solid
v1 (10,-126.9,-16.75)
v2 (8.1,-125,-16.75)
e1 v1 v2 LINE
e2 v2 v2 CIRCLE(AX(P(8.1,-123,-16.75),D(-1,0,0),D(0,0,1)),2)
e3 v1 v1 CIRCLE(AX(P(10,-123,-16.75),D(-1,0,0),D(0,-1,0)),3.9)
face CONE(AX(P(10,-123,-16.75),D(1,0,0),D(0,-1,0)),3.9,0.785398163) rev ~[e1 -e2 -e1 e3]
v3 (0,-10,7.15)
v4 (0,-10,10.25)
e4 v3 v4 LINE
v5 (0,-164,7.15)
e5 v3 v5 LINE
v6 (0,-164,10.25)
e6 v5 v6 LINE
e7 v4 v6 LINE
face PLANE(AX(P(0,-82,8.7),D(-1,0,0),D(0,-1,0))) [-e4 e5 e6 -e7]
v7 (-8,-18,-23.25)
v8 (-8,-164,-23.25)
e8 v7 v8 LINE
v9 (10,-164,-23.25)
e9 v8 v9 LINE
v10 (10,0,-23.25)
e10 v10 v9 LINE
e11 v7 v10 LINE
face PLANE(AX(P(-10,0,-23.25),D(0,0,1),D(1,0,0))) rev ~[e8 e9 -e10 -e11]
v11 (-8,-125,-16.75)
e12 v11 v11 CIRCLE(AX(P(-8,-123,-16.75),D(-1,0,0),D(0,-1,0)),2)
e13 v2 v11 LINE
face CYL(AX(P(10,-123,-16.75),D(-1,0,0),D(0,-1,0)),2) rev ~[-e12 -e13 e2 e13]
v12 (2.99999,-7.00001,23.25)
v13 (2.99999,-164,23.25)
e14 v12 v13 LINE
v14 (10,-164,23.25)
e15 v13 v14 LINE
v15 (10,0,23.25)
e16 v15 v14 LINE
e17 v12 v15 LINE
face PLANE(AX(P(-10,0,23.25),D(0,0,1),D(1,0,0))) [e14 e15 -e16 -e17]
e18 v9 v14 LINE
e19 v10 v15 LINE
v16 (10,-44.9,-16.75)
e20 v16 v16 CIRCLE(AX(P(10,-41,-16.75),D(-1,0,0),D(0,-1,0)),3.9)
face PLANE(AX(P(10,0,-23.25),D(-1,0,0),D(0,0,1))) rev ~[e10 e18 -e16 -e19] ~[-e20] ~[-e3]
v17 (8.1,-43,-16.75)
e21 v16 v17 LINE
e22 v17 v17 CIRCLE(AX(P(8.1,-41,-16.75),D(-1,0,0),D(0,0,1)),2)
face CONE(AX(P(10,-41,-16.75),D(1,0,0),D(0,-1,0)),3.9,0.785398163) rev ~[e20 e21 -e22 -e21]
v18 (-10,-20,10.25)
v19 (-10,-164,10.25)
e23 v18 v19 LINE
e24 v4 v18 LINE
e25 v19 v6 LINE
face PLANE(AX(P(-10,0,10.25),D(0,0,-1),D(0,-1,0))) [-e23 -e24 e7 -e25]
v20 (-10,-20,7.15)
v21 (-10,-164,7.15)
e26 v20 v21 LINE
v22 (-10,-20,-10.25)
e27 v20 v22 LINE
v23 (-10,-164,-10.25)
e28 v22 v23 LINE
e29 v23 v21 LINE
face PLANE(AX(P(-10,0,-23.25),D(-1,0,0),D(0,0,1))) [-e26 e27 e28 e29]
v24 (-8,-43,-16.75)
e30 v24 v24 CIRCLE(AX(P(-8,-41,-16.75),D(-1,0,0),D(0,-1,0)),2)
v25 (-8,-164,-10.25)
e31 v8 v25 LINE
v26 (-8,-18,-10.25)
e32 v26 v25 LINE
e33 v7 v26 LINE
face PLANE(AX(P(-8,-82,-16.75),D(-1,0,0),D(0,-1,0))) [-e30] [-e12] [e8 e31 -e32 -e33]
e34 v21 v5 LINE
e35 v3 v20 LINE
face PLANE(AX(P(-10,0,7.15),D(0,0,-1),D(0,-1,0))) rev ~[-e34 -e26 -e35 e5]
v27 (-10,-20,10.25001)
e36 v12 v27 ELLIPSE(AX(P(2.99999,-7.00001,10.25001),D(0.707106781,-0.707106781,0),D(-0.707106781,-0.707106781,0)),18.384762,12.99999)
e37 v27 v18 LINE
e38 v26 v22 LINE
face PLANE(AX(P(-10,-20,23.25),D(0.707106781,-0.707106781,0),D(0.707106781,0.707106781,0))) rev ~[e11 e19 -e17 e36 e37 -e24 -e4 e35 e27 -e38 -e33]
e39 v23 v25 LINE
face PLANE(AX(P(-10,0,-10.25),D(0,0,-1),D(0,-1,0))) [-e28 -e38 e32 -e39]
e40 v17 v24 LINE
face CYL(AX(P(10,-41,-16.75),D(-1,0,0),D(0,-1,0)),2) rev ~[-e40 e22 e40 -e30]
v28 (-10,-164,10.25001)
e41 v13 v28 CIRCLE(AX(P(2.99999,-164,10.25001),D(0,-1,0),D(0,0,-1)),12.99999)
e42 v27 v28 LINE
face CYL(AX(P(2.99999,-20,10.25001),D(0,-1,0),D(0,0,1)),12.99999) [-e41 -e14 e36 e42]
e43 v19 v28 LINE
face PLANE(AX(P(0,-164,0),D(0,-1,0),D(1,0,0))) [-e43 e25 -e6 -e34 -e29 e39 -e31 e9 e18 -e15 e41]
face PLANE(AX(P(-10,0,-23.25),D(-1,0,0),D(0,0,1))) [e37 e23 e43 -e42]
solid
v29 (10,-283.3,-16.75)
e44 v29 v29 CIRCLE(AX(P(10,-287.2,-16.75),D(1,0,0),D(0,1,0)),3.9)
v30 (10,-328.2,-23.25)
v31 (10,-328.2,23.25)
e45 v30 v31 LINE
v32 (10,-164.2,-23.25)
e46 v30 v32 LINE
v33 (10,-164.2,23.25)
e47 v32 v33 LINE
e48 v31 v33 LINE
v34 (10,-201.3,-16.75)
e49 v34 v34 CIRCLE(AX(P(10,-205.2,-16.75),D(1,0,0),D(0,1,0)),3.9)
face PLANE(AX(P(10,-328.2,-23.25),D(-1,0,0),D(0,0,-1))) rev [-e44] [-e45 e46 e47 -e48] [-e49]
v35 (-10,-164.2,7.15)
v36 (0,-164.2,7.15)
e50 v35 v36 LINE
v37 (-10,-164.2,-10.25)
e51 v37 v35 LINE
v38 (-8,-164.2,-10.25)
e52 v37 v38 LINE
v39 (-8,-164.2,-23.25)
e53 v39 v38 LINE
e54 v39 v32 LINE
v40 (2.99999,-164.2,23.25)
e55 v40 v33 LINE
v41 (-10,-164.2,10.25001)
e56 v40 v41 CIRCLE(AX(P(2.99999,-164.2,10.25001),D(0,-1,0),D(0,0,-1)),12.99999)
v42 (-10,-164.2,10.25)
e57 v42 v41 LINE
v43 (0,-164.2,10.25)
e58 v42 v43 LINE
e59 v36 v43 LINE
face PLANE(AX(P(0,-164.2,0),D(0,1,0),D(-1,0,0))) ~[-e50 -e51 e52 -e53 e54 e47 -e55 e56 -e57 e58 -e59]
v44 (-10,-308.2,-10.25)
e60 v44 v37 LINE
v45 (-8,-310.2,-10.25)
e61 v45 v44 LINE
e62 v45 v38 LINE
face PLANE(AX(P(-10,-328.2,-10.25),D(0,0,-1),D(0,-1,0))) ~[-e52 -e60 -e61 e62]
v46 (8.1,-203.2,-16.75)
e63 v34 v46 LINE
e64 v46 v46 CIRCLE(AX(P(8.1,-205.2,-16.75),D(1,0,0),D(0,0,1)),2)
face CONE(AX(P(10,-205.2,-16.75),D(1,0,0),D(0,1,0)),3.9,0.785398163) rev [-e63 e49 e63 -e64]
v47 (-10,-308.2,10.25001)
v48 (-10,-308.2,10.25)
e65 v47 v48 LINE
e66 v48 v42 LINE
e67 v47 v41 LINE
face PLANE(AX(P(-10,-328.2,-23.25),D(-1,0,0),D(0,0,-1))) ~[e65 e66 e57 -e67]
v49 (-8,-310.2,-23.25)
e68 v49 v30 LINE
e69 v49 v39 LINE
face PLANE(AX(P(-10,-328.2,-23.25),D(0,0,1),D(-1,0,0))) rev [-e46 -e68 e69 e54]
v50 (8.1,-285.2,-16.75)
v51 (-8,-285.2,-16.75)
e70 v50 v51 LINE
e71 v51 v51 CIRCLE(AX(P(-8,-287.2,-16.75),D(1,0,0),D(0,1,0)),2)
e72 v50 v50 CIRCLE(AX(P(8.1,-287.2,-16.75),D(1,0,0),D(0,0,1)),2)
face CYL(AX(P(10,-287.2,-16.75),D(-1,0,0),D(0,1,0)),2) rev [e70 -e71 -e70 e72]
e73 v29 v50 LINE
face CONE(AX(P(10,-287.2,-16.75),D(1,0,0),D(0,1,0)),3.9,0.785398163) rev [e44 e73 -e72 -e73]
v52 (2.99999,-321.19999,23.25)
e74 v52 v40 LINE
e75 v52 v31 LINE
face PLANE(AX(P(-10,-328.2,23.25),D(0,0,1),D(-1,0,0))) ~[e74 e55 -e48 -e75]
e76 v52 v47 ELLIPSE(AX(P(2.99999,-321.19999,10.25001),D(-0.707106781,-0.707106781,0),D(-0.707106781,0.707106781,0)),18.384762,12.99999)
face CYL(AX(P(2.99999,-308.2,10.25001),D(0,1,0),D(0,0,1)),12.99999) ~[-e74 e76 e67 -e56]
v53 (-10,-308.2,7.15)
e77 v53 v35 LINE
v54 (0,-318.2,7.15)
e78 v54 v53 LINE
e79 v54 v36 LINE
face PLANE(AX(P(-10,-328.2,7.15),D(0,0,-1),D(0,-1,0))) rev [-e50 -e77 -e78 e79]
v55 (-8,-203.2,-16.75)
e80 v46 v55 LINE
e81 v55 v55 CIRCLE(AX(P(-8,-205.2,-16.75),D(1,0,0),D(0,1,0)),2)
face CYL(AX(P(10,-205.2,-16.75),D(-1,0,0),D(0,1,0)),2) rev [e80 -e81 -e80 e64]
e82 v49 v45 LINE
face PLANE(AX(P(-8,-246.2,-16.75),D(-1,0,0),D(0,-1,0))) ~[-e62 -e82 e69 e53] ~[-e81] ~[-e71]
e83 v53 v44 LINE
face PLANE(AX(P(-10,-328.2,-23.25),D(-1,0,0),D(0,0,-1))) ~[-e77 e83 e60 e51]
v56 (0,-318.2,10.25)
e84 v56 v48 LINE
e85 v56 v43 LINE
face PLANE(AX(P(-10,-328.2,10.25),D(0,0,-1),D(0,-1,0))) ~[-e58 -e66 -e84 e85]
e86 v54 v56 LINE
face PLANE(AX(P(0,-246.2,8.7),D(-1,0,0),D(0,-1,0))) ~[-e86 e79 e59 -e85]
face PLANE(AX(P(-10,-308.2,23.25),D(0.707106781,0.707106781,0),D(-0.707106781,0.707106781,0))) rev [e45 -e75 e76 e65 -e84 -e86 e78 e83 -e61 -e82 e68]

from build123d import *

# Parameters (mm, degrees)
F0_W            = 20
F0_H            = 46.5
F1_DEPTH        = 164
F2_W            = 164
F2_H            = 3.1
F3_DEPTH        = 10
F4_W            = 164
F4_H            = 13
F5_DEPTH        = 2
F7_DEPTH        = 46.5
F8_R            = 12.99999
F10_D           = 4
F10_DEPTH       = 20
F10_CSINK_D     = 7.8
F10_CSINK_ANGLE = 90
F10_TIP         = 1.2017212381


# Not quite as in the source:
# - a fillet or chamfer is up to 0.001 mm smaller than in the source, because OpenCascade refuses the exact size


with BuildPart() as f1:
    # F0 (on Front) → F1 (new body)
    with BuildSketch(Plane.XZ):
        Rectangle(F0_W, F0_H)
    extrude(amount=F1_DEPTH)

    # F2 (on face) → F3 (cut)
    with BuildSketch(Plane(origin=(-10, 0, 0), x_dir=(0, -1, 0), z_dir=(-1, 0, 0))):
        with Locations((82, 8.7)):
            Rectangle(F2_W, F2_H)
    extrude(amount=-F3_DEPTH, mode=Mode.SUBTRACT)

    # F4 (on face) → F5 (cut)
    with BuildSketch(Plane(origin=(-10, 0, 0), x_dir=(0, -1, 0), z_dir=(-1, 0, 0))):
        with Locations((82, -16.75)):
            Rectangle(F4_W, F4_H)
    extrude(amount=-F5_DEPTH, mode=Mode.SUBTRACT)

    # F6 (on face) → F7 (cut, through all)
    with BuildSketch(Plane.XY.offset(23.25)):
        Polygon((-10, 0), (-10, -20), (10, 0), align=None)
    extrude(amount=-F7_DEPTH, mode=Mode.SUBTRACT)

    # F8 (radius 13 in the source; OpenCascade refuses exactly that, so slightly less here)
    f8_edges = [f1.edges().sort_by_distance(p)[0] for p in [
        (-10, -92, 23.25),
    ]]
    fillet(f8_edges, radius=F8_R)

    # F10
    with Locations(Plane.YZ.offset(10)):
        with Locations((-123, -16.75), (-41, -16.75)):
            CounterSinkHole(F10_D / 2, F10_CSINK_D / 2, depth=F10_DEPTH, counter_sink_angle=F10_CSINK_ANGLE)
            with Locations((0, 0, -(F10_DEPTH + F10_TIP / 2))):  # 118° drill point
                Cone(0, F10_D / 2, F10_TIP, mode=Mode.SUBTRACT)


with BuildPart() as f12_1:
    # F12: instance of F1
    add(f1.part.mirror(Plane(origin=(0.7724850415, -164.1, -0.683742713), x_dir=(1, 0, 0), z_dir=(0, -1, 0))))


solid = Compound([f1.part, f12_1.part])
